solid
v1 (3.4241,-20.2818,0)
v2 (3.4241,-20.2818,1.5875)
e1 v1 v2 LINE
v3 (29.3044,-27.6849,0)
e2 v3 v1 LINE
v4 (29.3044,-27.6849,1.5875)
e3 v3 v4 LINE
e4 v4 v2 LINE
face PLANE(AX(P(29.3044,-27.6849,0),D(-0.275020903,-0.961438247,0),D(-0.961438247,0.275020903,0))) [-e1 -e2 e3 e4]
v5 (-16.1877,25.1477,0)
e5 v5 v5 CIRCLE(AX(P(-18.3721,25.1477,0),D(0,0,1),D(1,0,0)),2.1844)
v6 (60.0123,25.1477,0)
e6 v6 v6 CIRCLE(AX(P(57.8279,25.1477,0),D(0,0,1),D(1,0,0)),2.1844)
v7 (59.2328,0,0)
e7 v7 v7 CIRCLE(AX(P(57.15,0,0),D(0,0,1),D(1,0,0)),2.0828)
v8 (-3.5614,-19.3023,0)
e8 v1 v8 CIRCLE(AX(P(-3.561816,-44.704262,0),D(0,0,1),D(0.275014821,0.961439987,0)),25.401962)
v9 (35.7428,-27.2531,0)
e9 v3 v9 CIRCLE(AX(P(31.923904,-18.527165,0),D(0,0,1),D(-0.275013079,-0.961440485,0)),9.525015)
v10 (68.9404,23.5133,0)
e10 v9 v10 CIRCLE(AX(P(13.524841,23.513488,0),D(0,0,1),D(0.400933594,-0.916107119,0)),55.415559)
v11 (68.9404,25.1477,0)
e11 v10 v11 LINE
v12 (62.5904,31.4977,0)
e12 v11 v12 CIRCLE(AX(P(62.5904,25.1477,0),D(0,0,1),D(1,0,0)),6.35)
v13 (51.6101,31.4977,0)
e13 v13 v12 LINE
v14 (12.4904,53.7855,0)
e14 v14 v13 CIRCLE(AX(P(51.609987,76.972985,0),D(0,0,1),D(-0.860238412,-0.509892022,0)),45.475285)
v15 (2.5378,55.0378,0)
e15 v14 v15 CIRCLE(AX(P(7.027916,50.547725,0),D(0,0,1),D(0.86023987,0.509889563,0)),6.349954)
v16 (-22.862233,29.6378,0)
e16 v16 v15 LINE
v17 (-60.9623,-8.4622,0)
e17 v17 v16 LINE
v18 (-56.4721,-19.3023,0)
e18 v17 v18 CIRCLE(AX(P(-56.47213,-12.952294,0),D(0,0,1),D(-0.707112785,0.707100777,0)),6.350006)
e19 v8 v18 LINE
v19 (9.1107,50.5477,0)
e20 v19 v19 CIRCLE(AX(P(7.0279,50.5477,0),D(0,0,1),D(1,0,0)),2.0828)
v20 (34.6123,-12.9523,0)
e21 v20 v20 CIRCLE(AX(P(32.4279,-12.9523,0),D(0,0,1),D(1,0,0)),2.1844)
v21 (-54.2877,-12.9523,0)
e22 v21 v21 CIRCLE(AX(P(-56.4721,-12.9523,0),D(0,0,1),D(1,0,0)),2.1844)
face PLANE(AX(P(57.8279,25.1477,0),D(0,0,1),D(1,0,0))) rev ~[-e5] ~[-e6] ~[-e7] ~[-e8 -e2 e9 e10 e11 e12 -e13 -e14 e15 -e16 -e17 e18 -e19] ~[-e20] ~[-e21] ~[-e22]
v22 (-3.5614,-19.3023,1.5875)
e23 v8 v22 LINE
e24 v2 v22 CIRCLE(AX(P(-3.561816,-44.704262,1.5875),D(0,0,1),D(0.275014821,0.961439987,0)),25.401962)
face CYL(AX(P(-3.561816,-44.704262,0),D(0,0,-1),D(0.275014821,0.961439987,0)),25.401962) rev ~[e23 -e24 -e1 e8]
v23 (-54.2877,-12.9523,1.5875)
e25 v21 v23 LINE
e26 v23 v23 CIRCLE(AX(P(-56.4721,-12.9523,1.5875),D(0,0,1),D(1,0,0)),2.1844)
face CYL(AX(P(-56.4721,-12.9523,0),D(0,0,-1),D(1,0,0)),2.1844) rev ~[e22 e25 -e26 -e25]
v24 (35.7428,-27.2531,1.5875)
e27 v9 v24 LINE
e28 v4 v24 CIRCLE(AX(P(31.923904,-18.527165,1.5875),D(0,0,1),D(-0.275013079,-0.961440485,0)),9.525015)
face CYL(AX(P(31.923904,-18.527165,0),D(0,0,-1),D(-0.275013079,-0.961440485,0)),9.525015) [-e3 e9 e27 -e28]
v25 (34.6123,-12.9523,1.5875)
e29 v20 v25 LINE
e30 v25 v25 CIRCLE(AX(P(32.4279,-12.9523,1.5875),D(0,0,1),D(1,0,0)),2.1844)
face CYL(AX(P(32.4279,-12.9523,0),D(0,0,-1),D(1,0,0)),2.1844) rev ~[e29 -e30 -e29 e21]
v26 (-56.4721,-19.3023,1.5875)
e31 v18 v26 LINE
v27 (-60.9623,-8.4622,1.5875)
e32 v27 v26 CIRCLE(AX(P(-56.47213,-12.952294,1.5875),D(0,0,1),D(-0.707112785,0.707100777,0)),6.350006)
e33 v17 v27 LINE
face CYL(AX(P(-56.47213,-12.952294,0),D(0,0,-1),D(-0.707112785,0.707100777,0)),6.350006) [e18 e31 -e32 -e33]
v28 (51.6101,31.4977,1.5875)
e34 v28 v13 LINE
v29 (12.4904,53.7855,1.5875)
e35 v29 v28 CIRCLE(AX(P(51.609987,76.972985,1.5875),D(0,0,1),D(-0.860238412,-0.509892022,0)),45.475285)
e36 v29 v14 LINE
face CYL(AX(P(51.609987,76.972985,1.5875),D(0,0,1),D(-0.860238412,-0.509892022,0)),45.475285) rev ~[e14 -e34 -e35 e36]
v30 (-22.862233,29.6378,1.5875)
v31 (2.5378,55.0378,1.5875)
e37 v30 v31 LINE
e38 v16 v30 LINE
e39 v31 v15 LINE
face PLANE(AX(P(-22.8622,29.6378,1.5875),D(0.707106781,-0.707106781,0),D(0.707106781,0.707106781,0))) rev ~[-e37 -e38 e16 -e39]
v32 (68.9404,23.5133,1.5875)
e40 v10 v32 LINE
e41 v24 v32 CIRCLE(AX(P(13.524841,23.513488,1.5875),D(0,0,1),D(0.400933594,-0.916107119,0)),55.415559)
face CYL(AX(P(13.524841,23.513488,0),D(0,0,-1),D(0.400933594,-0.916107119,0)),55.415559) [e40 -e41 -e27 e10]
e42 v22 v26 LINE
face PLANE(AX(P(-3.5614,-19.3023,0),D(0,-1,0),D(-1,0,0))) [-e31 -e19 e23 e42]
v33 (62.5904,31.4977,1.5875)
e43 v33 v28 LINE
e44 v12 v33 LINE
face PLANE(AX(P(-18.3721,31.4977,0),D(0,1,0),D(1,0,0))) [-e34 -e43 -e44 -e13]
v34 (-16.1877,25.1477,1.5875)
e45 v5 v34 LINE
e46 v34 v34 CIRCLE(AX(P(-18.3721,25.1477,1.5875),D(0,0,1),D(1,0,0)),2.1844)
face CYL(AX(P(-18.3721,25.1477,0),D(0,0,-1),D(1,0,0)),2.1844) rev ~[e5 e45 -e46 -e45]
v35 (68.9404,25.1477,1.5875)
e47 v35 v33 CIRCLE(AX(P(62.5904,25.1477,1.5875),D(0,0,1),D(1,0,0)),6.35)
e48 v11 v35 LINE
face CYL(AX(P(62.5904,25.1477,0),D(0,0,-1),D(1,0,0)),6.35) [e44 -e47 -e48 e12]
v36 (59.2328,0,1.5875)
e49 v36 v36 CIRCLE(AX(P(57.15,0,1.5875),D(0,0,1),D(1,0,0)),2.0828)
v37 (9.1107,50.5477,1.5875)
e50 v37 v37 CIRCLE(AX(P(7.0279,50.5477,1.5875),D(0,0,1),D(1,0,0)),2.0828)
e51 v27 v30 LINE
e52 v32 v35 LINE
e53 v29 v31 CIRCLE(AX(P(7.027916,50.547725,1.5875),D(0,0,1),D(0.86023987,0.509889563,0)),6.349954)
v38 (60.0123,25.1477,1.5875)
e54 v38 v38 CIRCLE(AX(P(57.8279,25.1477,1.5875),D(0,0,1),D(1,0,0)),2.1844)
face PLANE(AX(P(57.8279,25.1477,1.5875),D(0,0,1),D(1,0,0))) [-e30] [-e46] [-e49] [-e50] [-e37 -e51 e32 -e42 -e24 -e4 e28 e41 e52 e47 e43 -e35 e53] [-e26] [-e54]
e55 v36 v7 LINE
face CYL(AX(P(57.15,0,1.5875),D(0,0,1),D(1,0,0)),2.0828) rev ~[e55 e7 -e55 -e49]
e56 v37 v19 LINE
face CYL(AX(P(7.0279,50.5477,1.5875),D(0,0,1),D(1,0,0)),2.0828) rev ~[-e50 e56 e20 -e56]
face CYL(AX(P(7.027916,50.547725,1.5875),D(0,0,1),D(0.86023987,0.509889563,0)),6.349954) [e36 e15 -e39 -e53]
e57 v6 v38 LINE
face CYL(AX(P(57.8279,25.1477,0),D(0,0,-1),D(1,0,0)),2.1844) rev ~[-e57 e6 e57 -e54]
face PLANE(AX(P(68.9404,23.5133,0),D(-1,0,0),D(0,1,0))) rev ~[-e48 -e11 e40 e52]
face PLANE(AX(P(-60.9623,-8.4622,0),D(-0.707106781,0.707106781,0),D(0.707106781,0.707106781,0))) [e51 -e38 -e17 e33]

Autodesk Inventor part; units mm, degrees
ref_plane "YZ Plane" through (0, 0, 0) normal (1, 0, 0) x (0, 1, 0)
ref_plane "XZ Plane" through (0, 0, 0) normal (0, 1, 0) x (-1, 0, 0)
ref_plane "XY Plane" through (0, 0, 0) normal (0, 0, 1) x (1, 0, 0)
sketch "Sketch1" plane through (0, 0, 0) normal (0, 0, 1) x (1, 0, 0)
  circle A0 centre (-18.3721, 25.1477) radius 2.1844
  circle A1 centre (57.8279, 25.1477) radius 2.1844
  circle A2 centre (32.4279, -12.9523) radius 2.1844
  circle A3 centre (-56.4721, -12.9523) radius 2.1844
  arc A4 (-60.9623, -8.4622) -> (-56.4721, -19.3023) centre (-56.4721, -12.9523) ccw
  arc A5 (-18.3721, 31.4977) -> (-22.8623, 29.6378) centre (-18.3721, 25.1477) ccw
  line L0 (68.9404, 23.5133) -> (68.9404, 25.1477)
  line L1 (62.5904, 31.4977) -> (57.8279, 31.4977)
  arc A6 (68.9404, 25.1477) -> (62.5904, 31.4977) centre (62.5904, 25.1477) ccw
  line L2 (-3.5614, -19.3023) -> (-56.4721, -19.3023)
  line L3 (-60.9623, -8.4622) -> (-22.8623, 29.6378)
  line L4 (-18.3721, 31.4977) -> (57.8279, 31.4977)
  arc A7 (35.7428, -27.2531) -> (68.9404, 23.5133) centre (13.525, 23.5133) ccw
  line L5 (29.3044, -27.6849) -> (3.4241, -20.2818)
  arc A8 (29.3044, -27.6849) -> (35.7428, -27.2531) centre (31.9239, -18.5272) ccw
  arc A9 (3.4241, -20.2818) -> (-3.5614, -19.3023) centre (-3.5614, -44.7023) ccw
  point P0 (0, 0)
  point P1 (32.4279, -28.5784)
  dimension "d0" = 4.3688
  dimension "d1" = 12.7
  dimension "d2" = 12.7
  dimension "d4" = 6.35
  dimension "d21" = 9.525
  dimension "d22" = 25.4
extrude "Extrusion1" add sketch "Sketch1" along normal blind 1.5875
sketch "Sketch2" plane through (0, 0, 1.5875) normal (0, 0, 1) x (1, 0, 0)
  circle A0 centre (57.15, 0) radius 2.0828
  point P0 (0, 0)
  dimension "d7" = 4.1656
extrude "Extrusion2" cut sketch "Sketch2" against normal blind 1.5875
sketch "Sketch3" plane through (57.8279, 25.1477, 1.5875) normal (0, 0, 1) x (1, 0, 0)
  circle A0 centre (-50.8, 25.4) radius 2.0828
  arc A1 (-45.3375, 28.6378) -> (-55.2901, 29.8901) centre (-50.8, 25.4) ccw
  line L0 (-80.6901, 4.4901) -> (-55.2901, 29.8901)
  arc A2 (-76.2, 6.35) -> (-80.6901, 4.4901) centre (-76.2, 0) ccw projected
  arc A3 (-45.3375, 28.6378) -> (-6.2178, 6.35) centre (-6.2178, 51.8254) ccw
  line L1 (4.7625, 6.35) -> (-76.2, 6.35) projected
  dimension "d17" = 4.1656
extrude "Extrusion4" add sketch "Sketch3" against normal blind 1.5875
properties part number "sled" material "Acetal Resin, White"
